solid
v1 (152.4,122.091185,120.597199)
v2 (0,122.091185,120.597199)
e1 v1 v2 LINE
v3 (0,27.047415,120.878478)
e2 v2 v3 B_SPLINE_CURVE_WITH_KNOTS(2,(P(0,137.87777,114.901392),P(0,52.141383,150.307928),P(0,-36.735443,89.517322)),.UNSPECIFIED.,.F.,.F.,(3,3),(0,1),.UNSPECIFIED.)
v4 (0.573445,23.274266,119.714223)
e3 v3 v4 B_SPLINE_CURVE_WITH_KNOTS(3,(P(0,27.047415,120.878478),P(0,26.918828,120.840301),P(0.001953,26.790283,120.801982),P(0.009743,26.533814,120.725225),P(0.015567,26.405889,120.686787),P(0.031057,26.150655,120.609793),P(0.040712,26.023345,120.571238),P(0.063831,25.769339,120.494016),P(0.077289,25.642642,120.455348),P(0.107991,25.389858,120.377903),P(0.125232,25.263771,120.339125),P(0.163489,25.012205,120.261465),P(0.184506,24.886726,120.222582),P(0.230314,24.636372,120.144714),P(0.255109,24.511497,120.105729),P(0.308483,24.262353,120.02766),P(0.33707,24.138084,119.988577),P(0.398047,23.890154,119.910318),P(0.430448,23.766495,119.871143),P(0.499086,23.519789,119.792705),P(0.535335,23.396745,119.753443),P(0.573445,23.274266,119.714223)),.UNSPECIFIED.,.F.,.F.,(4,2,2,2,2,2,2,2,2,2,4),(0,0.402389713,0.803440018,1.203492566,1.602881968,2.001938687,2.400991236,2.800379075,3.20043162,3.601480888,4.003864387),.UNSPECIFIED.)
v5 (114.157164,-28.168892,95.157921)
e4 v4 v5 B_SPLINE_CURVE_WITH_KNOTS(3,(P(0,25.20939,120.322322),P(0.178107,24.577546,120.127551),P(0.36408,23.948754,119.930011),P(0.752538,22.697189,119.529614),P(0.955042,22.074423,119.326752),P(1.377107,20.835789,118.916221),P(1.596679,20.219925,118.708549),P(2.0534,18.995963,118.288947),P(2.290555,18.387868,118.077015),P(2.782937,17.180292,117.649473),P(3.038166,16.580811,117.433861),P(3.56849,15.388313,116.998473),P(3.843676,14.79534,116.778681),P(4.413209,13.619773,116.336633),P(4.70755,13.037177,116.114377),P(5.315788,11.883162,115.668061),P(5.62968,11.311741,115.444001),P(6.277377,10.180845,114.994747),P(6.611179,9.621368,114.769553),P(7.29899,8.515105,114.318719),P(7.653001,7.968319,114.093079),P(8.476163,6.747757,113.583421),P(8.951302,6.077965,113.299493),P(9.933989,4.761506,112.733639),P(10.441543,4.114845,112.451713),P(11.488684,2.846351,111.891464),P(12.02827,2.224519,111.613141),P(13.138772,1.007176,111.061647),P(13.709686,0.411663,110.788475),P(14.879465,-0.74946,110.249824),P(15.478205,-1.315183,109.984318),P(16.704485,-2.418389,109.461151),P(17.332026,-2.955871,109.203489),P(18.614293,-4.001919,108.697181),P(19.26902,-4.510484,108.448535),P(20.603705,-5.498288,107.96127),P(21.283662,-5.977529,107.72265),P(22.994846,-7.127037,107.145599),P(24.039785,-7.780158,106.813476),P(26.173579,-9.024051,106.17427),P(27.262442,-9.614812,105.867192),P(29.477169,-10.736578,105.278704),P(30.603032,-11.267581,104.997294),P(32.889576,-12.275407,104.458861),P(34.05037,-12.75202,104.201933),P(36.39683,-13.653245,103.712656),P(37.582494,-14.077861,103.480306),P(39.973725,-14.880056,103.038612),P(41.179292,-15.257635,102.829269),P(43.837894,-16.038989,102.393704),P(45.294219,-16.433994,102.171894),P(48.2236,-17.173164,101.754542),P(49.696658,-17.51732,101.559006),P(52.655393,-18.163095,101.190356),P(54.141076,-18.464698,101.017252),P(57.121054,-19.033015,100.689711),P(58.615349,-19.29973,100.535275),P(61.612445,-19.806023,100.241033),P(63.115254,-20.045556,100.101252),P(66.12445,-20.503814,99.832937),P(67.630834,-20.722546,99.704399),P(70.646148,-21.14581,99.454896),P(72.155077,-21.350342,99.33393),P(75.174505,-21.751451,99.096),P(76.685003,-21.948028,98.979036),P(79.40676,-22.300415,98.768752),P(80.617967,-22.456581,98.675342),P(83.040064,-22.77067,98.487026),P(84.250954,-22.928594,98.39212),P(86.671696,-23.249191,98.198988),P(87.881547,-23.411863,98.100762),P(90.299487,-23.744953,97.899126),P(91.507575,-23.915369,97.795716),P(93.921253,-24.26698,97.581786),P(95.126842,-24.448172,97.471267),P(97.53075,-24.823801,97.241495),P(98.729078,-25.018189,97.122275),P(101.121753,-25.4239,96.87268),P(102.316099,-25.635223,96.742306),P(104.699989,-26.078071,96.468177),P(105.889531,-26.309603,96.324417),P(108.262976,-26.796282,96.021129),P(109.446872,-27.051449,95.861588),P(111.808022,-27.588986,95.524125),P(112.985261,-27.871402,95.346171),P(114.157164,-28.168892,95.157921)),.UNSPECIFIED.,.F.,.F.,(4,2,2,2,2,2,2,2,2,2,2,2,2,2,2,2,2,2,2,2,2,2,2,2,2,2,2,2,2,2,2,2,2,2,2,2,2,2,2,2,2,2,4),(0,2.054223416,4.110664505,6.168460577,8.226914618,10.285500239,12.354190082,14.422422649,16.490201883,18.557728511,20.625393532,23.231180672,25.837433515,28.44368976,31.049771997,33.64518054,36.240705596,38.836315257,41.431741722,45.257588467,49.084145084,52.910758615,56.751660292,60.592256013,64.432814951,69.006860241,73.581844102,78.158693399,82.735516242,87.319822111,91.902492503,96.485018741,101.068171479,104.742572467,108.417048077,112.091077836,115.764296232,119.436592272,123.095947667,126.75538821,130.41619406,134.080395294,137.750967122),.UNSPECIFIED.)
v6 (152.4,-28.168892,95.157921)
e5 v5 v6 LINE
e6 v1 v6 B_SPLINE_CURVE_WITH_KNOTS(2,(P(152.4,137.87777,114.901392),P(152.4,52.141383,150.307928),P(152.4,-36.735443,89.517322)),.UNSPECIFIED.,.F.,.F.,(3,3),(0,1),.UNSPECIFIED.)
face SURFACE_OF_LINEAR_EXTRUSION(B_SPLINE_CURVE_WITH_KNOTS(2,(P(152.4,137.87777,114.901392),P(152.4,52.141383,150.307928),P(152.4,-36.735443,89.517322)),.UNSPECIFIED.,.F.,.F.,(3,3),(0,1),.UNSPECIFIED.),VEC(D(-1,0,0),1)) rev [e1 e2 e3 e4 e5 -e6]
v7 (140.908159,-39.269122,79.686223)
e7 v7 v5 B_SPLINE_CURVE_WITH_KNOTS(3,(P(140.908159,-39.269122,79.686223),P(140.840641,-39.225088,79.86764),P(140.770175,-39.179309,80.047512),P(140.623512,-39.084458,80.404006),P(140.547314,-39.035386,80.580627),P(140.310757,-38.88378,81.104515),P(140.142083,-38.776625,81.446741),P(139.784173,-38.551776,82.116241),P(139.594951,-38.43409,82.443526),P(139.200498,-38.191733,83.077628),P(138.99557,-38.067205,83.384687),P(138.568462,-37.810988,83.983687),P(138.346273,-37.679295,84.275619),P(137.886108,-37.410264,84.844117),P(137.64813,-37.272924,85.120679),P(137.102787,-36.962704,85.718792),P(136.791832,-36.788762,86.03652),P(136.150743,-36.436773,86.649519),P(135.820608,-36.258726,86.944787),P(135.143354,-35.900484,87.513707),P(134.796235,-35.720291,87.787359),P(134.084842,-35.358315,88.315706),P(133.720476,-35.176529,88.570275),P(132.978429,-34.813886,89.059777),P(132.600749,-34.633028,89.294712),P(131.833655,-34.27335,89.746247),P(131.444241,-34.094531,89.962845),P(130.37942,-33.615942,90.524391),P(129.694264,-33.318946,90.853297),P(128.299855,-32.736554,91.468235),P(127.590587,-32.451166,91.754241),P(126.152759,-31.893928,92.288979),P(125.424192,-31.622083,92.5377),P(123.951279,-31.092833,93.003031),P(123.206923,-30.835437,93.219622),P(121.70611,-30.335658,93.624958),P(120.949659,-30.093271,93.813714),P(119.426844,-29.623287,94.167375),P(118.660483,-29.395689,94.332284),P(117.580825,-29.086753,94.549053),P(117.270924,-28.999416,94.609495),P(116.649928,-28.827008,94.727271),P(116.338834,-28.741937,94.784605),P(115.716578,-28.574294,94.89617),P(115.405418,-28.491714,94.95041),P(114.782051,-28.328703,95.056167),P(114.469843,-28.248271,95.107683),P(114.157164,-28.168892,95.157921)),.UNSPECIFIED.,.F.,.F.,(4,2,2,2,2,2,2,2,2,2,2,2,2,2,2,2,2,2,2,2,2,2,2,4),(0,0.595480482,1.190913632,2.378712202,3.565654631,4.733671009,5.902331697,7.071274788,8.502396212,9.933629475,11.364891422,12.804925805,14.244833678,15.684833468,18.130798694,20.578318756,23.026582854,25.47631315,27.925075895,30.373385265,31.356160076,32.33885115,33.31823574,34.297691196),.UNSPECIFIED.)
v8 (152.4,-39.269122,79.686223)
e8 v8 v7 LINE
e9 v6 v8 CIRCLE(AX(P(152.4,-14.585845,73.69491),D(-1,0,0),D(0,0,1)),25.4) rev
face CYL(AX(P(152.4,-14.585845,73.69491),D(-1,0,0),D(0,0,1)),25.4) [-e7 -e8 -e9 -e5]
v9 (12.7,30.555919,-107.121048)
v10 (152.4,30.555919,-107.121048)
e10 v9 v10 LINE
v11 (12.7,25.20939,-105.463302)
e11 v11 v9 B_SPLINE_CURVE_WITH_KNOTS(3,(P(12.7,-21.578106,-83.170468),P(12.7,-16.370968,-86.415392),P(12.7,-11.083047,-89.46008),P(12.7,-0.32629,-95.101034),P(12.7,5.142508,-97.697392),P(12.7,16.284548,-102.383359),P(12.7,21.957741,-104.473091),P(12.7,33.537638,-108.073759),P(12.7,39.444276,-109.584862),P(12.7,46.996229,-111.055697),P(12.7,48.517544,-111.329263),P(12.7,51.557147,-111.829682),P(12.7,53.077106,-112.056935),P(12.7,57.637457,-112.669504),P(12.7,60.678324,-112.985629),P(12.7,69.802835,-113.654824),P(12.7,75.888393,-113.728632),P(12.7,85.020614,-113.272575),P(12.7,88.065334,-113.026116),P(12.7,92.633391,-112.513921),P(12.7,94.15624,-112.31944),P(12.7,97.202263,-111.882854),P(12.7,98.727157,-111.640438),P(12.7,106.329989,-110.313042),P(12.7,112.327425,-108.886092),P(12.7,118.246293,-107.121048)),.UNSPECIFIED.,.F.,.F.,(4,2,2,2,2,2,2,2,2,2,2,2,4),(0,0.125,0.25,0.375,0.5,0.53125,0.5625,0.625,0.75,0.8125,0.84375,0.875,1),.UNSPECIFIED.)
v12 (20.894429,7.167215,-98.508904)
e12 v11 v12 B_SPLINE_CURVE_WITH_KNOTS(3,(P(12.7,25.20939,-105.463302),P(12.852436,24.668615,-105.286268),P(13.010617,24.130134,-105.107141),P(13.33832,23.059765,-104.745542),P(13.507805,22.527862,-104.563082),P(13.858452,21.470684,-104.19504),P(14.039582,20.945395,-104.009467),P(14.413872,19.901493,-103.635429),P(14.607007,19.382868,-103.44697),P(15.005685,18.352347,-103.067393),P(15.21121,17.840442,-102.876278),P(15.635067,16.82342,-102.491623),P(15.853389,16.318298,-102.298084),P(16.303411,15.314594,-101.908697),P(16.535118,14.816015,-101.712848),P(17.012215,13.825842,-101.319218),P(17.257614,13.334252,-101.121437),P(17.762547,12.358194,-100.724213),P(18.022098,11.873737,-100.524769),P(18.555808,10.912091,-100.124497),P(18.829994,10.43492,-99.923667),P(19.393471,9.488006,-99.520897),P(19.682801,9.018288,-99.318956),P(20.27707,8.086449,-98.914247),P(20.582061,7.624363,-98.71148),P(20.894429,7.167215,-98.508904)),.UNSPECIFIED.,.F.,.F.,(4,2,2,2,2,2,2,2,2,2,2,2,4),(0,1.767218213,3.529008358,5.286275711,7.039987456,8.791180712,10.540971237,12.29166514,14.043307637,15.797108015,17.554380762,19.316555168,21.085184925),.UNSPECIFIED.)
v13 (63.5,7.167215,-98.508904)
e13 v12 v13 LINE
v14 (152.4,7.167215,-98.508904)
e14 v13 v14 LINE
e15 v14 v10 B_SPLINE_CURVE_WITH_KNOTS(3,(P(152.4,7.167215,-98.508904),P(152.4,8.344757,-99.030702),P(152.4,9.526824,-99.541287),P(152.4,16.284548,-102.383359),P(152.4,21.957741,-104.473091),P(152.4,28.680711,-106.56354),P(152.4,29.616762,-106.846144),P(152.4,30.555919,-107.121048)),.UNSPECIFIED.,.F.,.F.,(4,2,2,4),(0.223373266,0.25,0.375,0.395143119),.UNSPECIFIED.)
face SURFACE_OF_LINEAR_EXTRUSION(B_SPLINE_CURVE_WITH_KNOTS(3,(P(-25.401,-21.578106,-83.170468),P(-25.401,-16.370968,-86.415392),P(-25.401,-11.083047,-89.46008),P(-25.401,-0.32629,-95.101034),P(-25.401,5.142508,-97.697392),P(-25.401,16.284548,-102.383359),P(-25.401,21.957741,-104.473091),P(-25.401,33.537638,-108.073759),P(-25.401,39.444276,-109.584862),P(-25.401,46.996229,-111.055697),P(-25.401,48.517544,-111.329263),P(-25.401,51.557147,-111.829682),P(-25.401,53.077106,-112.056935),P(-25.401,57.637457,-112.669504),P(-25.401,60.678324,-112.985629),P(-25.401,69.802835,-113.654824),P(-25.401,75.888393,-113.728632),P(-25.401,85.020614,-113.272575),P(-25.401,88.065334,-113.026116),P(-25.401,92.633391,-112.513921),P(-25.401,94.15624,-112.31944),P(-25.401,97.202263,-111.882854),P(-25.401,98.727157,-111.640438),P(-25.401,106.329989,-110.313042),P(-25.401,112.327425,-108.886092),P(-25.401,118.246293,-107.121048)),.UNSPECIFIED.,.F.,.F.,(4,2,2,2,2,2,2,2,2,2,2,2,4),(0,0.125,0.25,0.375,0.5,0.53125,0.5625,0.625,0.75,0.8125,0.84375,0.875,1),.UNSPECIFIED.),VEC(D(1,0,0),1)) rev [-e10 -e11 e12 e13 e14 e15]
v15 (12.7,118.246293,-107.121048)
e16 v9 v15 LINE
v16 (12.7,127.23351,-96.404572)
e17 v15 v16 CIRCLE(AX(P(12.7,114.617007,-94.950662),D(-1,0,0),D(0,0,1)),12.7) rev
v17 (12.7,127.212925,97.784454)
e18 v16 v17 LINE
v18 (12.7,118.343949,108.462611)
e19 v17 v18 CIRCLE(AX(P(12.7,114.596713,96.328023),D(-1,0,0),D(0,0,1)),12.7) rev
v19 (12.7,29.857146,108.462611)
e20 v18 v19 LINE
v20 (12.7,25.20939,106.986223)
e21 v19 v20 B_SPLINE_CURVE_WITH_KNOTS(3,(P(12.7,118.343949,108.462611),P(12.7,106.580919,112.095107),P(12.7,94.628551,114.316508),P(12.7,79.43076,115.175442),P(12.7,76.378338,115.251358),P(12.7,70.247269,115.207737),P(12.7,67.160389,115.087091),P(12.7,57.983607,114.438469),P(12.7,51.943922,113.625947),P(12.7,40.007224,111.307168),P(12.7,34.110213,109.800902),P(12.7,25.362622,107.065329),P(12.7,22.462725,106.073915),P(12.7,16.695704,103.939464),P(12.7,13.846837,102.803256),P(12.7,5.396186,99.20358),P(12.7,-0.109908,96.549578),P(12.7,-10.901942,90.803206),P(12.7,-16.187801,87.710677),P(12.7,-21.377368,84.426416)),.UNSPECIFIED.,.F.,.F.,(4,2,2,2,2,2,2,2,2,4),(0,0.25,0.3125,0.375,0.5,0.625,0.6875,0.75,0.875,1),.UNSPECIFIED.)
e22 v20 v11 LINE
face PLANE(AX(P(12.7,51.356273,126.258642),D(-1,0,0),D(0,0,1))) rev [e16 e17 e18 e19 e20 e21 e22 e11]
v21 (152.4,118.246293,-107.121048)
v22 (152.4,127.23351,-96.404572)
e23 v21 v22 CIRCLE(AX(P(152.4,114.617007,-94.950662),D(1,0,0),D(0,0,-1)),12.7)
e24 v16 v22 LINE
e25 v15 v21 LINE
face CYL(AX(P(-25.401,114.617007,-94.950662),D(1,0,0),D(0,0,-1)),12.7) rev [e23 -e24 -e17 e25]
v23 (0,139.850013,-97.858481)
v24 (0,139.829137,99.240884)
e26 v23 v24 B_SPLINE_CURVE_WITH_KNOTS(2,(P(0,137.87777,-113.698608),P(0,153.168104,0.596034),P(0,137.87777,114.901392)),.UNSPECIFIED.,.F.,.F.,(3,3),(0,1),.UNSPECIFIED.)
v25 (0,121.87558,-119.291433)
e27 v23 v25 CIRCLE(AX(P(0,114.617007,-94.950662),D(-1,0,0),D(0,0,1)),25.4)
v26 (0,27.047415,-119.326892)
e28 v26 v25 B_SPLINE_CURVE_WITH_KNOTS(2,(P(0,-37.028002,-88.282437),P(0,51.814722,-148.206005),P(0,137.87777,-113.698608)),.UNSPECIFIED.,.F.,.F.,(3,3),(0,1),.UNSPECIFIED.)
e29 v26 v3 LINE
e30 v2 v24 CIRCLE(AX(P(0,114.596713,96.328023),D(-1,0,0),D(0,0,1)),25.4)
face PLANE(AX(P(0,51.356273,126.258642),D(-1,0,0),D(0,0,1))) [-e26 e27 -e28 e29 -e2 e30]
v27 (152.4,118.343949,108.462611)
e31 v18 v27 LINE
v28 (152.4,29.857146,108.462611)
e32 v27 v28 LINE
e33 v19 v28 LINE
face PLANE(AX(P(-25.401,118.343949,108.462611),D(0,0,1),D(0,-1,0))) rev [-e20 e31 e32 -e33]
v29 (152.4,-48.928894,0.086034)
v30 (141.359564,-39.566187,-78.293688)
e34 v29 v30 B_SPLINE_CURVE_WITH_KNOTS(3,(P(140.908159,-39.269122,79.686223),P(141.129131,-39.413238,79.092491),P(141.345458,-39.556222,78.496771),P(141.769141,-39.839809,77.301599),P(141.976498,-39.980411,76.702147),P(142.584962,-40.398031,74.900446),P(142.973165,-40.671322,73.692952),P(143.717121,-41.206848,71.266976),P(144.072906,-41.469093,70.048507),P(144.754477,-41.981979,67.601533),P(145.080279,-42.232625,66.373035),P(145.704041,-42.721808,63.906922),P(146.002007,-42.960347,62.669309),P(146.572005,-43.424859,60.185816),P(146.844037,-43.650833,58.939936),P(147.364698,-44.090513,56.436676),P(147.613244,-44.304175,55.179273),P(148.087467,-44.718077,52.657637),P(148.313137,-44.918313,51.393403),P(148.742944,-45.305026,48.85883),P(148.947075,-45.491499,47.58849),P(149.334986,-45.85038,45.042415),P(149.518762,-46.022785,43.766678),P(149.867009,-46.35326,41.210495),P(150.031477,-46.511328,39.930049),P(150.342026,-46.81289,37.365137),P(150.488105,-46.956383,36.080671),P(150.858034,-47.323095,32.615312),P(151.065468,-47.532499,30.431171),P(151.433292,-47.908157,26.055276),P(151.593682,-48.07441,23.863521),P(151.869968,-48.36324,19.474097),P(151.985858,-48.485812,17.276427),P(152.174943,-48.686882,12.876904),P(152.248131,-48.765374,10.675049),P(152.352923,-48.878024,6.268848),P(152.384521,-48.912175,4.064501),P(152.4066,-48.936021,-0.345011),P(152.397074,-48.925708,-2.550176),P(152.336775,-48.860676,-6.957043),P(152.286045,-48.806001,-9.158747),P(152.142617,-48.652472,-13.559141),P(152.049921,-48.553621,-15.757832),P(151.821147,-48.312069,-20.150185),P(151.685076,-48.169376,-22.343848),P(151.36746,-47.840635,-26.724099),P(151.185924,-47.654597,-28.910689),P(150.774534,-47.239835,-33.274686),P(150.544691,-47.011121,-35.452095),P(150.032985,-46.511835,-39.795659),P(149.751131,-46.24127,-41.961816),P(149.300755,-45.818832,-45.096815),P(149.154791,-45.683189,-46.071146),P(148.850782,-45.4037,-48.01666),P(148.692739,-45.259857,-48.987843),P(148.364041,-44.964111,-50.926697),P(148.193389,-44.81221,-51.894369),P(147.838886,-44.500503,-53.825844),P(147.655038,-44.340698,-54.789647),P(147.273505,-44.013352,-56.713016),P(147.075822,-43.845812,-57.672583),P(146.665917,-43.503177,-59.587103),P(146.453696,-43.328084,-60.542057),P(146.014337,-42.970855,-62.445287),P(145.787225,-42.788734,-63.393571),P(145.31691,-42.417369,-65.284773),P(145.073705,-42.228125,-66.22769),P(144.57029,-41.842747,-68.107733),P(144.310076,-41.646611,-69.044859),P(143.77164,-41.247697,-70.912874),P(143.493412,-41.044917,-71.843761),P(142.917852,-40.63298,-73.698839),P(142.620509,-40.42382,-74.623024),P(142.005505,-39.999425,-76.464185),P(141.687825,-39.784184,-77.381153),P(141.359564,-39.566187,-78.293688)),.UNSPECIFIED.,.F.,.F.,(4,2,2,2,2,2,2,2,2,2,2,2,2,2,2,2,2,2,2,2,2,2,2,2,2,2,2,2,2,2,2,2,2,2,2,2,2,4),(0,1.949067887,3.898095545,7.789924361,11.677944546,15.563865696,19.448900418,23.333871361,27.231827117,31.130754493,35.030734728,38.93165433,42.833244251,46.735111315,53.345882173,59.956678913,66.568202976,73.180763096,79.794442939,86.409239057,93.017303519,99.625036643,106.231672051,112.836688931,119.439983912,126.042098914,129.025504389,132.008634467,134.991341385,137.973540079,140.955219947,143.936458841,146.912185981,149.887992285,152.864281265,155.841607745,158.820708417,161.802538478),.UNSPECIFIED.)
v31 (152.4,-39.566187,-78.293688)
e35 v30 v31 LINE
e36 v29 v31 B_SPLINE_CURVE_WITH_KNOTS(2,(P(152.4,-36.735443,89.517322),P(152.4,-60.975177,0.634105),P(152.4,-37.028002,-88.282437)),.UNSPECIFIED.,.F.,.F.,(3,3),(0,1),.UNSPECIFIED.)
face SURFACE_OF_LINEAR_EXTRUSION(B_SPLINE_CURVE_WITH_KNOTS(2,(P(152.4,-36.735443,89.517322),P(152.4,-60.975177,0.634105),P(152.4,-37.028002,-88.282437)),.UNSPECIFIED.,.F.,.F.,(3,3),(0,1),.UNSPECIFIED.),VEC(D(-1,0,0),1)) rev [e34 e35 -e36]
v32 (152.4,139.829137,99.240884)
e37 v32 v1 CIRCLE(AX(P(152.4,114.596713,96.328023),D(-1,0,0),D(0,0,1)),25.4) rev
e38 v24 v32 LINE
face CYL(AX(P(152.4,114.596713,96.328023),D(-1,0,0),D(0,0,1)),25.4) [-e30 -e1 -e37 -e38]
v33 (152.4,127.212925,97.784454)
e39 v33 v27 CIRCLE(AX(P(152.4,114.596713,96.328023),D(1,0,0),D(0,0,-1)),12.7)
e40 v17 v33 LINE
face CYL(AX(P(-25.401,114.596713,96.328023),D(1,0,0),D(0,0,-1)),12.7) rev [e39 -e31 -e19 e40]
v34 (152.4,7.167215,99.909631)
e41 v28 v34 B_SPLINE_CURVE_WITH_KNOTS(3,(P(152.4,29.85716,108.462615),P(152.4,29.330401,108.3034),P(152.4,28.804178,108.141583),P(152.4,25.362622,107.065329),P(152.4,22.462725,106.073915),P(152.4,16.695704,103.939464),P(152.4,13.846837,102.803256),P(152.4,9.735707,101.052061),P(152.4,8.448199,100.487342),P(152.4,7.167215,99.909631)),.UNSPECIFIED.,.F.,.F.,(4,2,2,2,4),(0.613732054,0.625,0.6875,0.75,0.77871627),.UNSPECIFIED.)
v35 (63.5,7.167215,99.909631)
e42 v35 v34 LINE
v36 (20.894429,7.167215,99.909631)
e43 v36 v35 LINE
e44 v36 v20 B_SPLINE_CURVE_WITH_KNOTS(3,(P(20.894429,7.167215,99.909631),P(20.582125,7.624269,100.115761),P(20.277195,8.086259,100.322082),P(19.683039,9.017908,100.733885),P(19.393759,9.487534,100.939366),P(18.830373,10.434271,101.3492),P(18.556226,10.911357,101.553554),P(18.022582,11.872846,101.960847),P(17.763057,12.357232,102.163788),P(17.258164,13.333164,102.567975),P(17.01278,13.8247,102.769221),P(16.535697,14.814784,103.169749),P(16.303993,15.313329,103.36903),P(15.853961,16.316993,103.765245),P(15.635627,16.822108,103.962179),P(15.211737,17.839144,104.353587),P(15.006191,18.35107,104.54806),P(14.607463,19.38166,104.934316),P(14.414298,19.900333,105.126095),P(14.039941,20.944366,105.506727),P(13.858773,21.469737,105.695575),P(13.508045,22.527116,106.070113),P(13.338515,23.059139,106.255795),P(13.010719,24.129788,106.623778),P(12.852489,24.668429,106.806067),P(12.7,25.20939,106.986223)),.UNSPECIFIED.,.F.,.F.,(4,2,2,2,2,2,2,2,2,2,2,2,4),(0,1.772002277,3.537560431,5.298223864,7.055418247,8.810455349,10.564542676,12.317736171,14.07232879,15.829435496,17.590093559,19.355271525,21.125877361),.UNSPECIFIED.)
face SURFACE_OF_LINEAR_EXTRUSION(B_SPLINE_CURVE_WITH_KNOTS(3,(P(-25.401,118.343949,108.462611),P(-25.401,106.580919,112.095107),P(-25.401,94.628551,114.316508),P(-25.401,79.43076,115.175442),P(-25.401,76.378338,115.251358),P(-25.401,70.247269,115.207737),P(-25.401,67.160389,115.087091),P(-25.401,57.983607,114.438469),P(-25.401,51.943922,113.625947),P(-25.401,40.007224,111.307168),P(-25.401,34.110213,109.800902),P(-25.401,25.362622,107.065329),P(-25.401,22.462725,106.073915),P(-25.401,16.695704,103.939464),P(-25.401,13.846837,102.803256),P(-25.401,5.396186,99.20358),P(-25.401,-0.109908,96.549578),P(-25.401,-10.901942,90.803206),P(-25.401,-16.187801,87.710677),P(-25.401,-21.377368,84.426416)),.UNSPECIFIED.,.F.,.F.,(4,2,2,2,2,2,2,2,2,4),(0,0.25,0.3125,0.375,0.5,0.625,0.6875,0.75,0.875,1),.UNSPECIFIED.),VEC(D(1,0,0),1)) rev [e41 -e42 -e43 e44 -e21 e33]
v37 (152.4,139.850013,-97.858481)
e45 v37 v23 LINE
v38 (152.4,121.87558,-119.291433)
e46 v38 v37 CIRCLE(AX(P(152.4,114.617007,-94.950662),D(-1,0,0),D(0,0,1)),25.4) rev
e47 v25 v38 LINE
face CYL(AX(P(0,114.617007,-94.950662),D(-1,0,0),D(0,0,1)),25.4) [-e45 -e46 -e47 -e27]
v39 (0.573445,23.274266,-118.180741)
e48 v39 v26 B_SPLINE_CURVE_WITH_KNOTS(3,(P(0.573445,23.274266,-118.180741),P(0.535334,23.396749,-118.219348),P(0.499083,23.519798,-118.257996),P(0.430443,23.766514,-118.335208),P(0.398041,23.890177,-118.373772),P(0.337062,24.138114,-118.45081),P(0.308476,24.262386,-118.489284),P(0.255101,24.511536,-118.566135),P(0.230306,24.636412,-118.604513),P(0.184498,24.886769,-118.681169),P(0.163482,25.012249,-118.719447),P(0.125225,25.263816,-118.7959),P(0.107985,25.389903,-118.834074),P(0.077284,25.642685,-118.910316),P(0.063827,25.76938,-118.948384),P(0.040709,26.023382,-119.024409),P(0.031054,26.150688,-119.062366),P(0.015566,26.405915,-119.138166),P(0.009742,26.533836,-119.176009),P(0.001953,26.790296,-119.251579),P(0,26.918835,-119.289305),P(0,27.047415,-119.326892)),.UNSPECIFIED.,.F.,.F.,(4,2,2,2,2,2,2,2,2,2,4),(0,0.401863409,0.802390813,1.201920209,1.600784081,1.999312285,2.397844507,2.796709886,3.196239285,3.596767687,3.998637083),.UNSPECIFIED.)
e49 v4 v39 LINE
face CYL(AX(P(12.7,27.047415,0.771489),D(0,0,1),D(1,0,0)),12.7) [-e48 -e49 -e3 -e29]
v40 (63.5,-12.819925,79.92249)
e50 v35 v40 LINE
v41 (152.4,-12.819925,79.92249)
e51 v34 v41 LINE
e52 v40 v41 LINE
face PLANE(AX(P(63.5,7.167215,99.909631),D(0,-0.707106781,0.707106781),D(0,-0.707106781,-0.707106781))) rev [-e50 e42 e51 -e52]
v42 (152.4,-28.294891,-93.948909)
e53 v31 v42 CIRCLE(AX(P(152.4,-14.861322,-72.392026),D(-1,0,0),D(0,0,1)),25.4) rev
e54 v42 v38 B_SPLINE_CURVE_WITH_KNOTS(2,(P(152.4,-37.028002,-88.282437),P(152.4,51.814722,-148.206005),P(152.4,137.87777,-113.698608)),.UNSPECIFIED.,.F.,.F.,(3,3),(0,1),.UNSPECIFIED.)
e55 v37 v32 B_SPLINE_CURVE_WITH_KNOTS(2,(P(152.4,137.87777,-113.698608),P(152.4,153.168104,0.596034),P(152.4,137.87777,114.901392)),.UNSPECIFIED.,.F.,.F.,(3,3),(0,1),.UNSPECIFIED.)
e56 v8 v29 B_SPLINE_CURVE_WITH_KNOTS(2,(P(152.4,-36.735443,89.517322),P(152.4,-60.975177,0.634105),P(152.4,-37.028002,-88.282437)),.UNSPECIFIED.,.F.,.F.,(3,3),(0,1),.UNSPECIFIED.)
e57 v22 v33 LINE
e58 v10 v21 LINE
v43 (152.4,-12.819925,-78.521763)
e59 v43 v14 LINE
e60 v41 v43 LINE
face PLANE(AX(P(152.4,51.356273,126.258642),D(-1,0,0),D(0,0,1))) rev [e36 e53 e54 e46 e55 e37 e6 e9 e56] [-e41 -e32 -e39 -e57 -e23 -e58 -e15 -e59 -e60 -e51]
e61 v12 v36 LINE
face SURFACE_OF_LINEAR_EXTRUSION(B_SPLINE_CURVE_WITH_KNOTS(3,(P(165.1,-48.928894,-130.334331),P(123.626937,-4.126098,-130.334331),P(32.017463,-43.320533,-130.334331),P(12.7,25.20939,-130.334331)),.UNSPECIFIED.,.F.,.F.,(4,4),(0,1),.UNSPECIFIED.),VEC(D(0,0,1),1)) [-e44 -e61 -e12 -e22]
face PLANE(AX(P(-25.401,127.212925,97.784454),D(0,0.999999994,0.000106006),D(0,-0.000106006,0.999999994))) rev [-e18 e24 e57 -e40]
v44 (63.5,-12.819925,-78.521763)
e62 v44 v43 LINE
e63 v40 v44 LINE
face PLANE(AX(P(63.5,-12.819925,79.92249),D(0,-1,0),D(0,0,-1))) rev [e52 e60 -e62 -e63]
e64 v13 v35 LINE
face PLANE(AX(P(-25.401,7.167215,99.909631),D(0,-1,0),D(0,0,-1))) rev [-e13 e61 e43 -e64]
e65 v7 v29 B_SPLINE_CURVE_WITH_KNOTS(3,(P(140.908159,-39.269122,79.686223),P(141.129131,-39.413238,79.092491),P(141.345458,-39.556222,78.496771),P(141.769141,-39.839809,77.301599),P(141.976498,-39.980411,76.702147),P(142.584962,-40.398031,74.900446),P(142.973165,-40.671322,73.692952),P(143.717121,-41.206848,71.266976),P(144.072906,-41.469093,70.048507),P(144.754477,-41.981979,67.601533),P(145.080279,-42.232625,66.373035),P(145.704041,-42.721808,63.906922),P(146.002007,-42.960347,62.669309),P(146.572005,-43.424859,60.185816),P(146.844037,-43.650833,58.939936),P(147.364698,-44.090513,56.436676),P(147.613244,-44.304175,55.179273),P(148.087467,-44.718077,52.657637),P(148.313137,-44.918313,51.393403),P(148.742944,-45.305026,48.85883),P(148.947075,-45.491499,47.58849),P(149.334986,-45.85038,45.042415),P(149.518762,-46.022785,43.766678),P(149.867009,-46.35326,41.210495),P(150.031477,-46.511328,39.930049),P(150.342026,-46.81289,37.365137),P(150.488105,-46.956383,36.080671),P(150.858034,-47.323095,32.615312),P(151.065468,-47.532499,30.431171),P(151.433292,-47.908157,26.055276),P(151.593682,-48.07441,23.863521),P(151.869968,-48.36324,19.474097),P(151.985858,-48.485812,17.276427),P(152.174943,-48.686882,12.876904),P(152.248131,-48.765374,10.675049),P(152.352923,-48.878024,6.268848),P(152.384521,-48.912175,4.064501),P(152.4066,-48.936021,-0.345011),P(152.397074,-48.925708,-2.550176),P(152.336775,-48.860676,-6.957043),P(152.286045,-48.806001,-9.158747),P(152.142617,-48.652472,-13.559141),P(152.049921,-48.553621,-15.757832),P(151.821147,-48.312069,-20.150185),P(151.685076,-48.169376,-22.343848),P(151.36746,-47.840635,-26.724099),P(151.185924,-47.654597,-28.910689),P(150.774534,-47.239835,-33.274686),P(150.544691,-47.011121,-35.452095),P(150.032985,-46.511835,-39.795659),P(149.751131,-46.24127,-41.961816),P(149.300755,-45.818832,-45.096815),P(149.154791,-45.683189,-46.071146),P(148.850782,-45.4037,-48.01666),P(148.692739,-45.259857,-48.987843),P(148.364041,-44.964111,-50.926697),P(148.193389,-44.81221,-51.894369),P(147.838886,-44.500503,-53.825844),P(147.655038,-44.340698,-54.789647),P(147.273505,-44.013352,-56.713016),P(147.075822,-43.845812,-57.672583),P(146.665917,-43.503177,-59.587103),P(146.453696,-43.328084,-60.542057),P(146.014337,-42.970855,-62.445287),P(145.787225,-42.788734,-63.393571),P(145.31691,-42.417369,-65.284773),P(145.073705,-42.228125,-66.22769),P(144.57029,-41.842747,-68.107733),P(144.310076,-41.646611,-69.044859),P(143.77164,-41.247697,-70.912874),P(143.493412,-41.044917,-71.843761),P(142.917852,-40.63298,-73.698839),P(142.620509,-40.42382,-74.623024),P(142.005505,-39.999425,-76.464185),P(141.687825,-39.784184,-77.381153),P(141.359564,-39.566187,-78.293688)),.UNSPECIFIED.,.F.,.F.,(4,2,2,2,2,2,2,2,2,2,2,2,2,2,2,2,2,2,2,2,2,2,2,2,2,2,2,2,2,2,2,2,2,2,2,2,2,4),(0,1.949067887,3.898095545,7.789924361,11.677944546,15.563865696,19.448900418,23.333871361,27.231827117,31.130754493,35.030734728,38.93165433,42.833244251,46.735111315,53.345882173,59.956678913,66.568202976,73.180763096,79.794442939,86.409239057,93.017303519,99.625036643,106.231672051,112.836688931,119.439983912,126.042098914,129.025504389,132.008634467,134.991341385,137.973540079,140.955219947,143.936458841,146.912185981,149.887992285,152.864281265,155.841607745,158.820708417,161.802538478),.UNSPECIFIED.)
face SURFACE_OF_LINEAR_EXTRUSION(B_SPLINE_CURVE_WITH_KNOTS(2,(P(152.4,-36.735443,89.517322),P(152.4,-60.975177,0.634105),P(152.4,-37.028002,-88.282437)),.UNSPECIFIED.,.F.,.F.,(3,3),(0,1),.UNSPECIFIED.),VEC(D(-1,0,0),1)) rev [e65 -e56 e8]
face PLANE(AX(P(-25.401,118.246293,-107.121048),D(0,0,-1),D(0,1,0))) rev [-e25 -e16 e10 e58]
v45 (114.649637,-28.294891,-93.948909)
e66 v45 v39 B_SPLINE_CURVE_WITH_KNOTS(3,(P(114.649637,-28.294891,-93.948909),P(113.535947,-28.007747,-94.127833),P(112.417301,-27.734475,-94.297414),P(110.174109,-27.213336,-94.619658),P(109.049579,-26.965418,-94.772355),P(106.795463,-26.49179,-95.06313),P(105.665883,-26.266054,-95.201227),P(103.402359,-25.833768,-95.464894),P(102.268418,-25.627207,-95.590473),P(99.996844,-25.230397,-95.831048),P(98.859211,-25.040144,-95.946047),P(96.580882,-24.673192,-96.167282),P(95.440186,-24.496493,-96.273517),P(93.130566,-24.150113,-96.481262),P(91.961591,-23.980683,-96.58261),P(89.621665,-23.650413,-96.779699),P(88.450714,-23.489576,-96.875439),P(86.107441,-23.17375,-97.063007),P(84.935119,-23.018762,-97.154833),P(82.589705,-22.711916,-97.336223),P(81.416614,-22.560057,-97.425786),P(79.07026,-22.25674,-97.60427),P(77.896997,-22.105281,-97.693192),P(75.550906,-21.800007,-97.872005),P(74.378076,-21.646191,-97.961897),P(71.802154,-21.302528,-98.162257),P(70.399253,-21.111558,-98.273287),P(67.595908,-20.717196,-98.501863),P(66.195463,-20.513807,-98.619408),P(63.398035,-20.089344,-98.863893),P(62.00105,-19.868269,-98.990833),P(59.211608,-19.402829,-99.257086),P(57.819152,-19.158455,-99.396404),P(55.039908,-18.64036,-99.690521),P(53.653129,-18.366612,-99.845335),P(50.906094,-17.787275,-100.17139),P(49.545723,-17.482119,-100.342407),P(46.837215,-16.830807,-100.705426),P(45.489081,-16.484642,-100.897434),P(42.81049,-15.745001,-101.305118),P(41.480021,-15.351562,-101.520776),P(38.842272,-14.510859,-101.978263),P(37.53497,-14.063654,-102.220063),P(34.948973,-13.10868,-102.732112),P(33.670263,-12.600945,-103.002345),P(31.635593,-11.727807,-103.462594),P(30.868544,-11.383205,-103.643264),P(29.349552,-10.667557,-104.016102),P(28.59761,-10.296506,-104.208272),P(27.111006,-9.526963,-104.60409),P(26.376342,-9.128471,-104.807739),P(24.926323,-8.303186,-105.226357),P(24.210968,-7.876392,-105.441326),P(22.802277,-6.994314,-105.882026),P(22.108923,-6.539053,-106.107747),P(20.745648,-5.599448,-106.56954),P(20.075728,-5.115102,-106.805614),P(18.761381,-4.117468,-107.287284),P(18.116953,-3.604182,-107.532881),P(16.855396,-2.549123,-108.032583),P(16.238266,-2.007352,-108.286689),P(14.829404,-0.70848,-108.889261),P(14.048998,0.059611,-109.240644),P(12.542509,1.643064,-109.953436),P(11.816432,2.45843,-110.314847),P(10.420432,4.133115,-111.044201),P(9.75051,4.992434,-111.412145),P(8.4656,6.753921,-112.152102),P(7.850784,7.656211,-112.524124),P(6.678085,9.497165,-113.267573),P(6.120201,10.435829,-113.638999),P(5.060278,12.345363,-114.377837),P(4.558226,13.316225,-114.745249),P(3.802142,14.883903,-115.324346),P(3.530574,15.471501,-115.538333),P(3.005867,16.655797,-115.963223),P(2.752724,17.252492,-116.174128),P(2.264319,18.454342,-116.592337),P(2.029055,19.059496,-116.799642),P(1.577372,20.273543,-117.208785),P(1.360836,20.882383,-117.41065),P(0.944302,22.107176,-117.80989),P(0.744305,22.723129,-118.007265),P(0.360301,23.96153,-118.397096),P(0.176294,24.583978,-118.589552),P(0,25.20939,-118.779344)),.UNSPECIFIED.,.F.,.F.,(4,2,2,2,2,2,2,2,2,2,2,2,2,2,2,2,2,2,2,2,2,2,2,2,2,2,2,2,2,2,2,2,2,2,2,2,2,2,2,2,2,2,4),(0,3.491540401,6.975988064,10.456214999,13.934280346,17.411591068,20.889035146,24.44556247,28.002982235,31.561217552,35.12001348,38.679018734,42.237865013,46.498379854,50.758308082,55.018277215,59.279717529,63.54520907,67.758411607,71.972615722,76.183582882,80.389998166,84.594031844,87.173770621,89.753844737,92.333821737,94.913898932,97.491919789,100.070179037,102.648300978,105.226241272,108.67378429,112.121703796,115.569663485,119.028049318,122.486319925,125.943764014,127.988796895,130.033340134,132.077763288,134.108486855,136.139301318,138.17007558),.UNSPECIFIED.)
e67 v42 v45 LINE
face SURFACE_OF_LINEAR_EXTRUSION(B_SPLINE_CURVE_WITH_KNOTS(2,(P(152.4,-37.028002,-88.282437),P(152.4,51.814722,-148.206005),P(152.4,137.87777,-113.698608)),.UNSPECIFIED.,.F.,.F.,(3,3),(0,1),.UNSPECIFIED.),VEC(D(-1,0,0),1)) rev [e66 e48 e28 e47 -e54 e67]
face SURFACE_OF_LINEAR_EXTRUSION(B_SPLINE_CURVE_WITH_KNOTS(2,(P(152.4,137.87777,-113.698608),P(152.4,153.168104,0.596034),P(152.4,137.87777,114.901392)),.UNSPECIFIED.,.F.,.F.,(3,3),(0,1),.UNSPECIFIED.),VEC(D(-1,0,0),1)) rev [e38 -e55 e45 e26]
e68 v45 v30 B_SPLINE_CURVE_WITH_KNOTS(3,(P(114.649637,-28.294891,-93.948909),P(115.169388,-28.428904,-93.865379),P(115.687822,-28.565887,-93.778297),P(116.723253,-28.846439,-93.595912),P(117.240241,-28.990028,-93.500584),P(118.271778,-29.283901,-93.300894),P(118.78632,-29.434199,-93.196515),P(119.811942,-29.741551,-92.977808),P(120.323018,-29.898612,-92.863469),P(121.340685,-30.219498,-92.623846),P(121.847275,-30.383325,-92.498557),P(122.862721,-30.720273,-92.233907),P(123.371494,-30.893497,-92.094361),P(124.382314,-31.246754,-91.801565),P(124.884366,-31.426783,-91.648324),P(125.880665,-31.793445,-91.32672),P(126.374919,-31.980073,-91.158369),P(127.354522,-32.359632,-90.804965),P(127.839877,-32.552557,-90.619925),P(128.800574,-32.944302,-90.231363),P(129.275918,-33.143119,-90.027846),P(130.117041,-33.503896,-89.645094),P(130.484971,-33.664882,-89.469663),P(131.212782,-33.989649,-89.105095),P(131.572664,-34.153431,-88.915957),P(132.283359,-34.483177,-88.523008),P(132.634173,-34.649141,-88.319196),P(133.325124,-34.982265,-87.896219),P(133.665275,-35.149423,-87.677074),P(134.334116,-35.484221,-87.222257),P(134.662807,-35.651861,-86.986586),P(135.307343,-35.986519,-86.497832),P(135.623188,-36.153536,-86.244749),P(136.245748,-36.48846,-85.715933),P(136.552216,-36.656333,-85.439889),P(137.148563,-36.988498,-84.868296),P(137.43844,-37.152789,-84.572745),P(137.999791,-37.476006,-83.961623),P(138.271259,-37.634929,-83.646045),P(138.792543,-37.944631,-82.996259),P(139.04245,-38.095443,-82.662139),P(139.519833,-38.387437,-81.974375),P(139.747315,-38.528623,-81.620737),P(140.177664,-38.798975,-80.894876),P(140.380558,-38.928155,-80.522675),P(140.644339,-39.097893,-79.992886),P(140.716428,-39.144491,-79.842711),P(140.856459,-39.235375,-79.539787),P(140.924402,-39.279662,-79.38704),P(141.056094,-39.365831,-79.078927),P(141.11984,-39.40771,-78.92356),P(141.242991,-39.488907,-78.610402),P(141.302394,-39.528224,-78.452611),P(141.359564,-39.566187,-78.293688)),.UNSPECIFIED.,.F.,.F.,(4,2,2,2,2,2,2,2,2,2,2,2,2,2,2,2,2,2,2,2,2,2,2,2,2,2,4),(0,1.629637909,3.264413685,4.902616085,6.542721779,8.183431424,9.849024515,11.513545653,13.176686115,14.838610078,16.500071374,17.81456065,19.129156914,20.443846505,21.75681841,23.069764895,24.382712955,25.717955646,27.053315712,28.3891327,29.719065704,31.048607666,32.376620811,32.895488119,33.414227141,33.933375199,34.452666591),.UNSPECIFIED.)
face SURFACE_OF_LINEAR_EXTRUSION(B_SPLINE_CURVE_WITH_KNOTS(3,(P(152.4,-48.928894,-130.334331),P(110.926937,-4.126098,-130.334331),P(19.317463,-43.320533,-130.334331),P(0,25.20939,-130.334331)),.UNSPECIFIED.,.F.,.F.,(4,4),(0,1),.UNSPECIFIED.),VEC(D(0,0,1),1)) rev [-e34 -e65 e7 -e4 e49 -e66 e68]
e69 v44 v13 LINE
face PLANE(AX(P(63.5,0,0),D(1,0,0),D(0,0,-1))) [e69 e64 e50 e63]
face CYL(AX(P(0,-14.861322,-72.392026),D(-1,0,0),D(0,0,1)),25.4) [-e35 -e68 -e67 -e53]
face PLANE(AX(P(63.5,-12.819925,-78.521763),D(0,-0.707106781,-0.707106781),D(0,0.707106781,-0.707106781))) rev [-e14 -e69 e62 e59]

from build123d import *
from OCP.BRepAlgoAPI import BRepAlgoAPI_Cut
from OCP.TopTools import TopTools_ListOfShape

# Parameters (mm, degrees)
BOSS_EXTRUDE8_DEPTH      = 152.4
FILLET4_R                = 25.4
FILLET5_R                = 25.4
FILLET6_R                = 25.4
FILLET7_R                = 25.4
CUT_EXTRUDE16_DEPTH      = 247.514886375
CUT_EXTRUDE16_DEPTH_BACK = 247.514886375
SKETCH15_OUTSIDE_W       = 225.302
SKETCH15_OUTSIDE_H       = 267.354
CUT_EXTRUDE15_START      = -139.7
CUT_EXTRUDE15_DEPTH      = 139.7
CUT_EXTRUDE15_START_2    = -107.121047974
CUT_EXTRUDE15_2_DEPTH    = 215.583659042
FILLET10_R               = 12.7
CUT_EXTRUDE17_DEPTH      = 88.9


with BuildPart() as part:
    # Sketch8 → Boss-Extrude8 (new body)
    with BuildSketch(Plane(origin=(0, 0, 0), x_dir=(0, 0, -1), z_dir=(1, 0, 0))):
        with BuildLine():
            add(Edge.make_bspline(
                [(-89.517321988, -36.735442624), (-0.634104952, -60.975176902), (88.282437318, -37.028001665)],
                knots=[0, 0, 0, 1, 1, 1], degree=2))
            add(Edge.make_bspline(
                [(113.698608464, 137.87777005), (148.206005145, 51.814722278), (88.282437318, -37.028001665)],
                knots=[0, 0, 0, 1, 1, 1], degree=2))
            add(Edge.make_bspline(
                [(-114.901391536, 137.87777005), (-0.596034429, 153.168104446), (113.698608464, 137.87777005)],
                knots=[0, 0, 0, 1, 1, 1], degree=2))
            add(Edge.make_bspline(
                [(-114.901391536, 137.87777005), (-150.307927624, 52.141383045), (-89.517321988, -36.735442624)],
                knots=[0, 0, 0, 1, 1, 1], degree=2))
        make_face()
    extrude(amount=BOSS_EXTRUDE8_DEPTH)

    # Fillet4
    fillet4_edges = [part.edges().sort_by_distance(p)[0] for p in [
        (76.2, 137.87777005, 114.901391536),
    ]]
    fillet(fillet4_edges, radius=FILLET4_R)

    # Fillet5
    fillet5_edges = [part.edges().sort_by_distance(p)[0] for p in [
        (76.2, -36.735442624, 89.517321988),
    ]]
    fillet(fillet5_edges, radius=FILLET5_R)

    # Fillet6
    fillet6_edges = [part.edges().sort_by_distance(p)[0] for p in [
        (76.2, -37.028001665, -88.282437318),
    ]]
    fillet(fillet6_edges, radius=FILLET6_R)

    # Fillet7
    fillet7_edges = [part.edges().sort_by_distance(p)[0] for p in [
        (76.2, 137.87777005, -113.698608464),
    ]]
    fillet(fillet7_edges, radius=FILLET7_R)


with BuildPart() as cut_extrude16_tool:
    # Sketch15 outside → Cut-Extrude16 (new, two sides: drawn at the far end of the back side and taken through both)
    with BuildSketch(Plane.XY.offset(-CUT_EXTRUDE16_DEPTH_BACK)):
        with Locations((76.2, 48.297)):
            Rectangle(SKETCH15_OUTSIDE_W, SKETCH15_OUTSIDE_H)
        with BuildLine():
            Line((0, 145.522937248), (152.4, 145.522937248))
            Line((152.4, 145.522937248), (152.4, -48.92889358))
            add(Edge.make_bspline(
                [(152.4, -48.92889358), (110.926936948, -4.126097701), (19.317462744, -43.320532891), (0, 25.209390068)],
                knots=[0, 0, 0, 0, 1, 1, 1, 1], degree=3))
            Line((0, 25.209390068), (0, 145.522937248))
        make_face(mode=Mode.SUBTRACT)
    extrude(amount=CUT_EXTRUDE16_DEPTH + CUT_EXTRUDE16_DEPTH_BACK)


with BuildPart() as part_1:
    add(part.part)

    # Cut-Extrude16: cut by cut_extrude16_tool, with a tolerance
    cut_extrude16_stock = TopTools_ListOfShape()
    cut_extrude16_stock.Append(part_1.part.wrapped)
    cut_extrude16_tools = TopTools_ListOfShape()
    cut_extrude16_tools.Append(cut_extrude16_tool.part.wrapped)
    cut_extrude16_cut = BRepAlgoAPI_Cut()
    cut_extrude16_cut.SetArguments(cut_extrude16_stock)
    cut_extrude16_cut.SetTools(cut_extrude16_tools)
    cut_extrude16_cut.SetFuzzyValue(0.00001)
    cut_extrude16_cut.Build()
    add(Compound.cast(cut_extrude16_cut.Shape()).solids(), mode=Mode.REPLACE)

    # Cut-Extrude15: read off the stored shape, not the designer's step
    # Cut-Extrude15 outline → Cut-Extrude15 (cut)
    with BuildSketch(Plane(origin=(152.4, 0, 0), x_dir=(0, 0, -1), z_dir=(1, 0, 0)).offset(CUT_EXTRUDE15_START)):
        with BuildLine():
            Line((-108.462610918, 118.343948744), (-108.462610968, 29.857145502))
            add(Edge.make_bspline(
                [(-108.462610968, 29.857145502), (-108.303396792, 29.330392086), (-108.141581561, 28.80417359), (-107.065329269, 25.362622105), (-106.073914967, 22.462725385), (-103.939463928, 16.695703636), (-102.803256247, 13.846836756), (-101.052061435, 9.735706989), (-100.487342065, 8.448198791), (-99.909630865, 7.167215308)],
                knots=[0.613732154, 0.613732154, 0.613732154, 0.613732154, 0.625, 0.625, 0.6875, 0.6875, 0.75, 0.75, 0.77871627, 0.77871627, 0.77871627, 0.77871627], degree=3))
            Line((-99.909630865, 7.167215308), (98.50890353, 7.1672153))
            add(Edge.make_bspline(
                [(98.50890353, 7.1672153), (99.030702422, 8.344757297), (99.541287229, 9.526823546), (102.383358501, 16.284548345), (104.473090717, 21.957741134), (106.563539536, 28.680710786), (106.846143617, 29.616761908), (107.121047874, 30.555919476)],
                knots=[0.223373266, 0.223373266, 0.223373266, 0.223373266, 0.25, 0.25, 0.375, 0.375, 0.395143119, 0.395143119, 0.395143119, 0.395143119], degree=3))
            Line((107.121047874, 30.555919476), (107.121047874, 118.246293452))
            ThreePointArc((107.121047874, 118.246293452), (103.111414114, 124.347995452), (96.404571724, 127.233510198))
            Line((96.404571724, 127.233510198), (-97.784453574, 127.21292508))
            ThreePointArc((-97.784453574, 127.21292508), (-104.442431868, 124.366378649), (-108.462610918, 118.343948744))
        make_face()
    extrude(amount=CUT_EXTRUDE15_DEPTH, mode=Mode.SUBTRACT)

    # Cut-Extrude15 2 outline → Cut-Extrude15 2 (add)
    with BuildSketch(Plane.XY.offset(CUT_EXTRUDE15_START_2)):
        with BuildLine():
            Line((12.7, 7.167215307), (20.89442948, 7.1672153))
            add(Edge.make_bspline(
                [(20.89442948, 7.1672153), (17.477928889, 12.167382595), (14.701088569, 18.110401588), (12.7, 25.209390068)],
                knots=[0.896410383, 0.896410383, 0.896410383, 0.896410383, 1, 1, 1, 1], degree=3))
            Line((12.7, 25.209390068), (12.7, 7.167215307))
        make_face()
    extrude(amount=CUT_EXTRUDE15_2_DEPTH)

    # Fillet10
    fillet10_edges = [part_1.edges().sort_by_distance(p)[0] for p in [
        (0, 25.209390068, 60.161160898),
    ]]
    fillet(fillet10_edges, radius=FILLET10_R)

    # Sketch17 → Cut-Extrude17 (cut)
    with BuildSketch(Plane(origin=(152.4, 0, 0), x_dir=(0, 0, -1), z_dir=(1, 0, 0))):
        Polygon((-99.909630865, 7.167215308), (-79.922490142, -12.819925415), (78.521762811, -12.819925415), (98.508903533, 7.167215308), align=None)
    extrude(amount=-CUT_EXTRUDE17_DEPTH, mode=Mode.SUBTRACT)


solid = part_1.part
